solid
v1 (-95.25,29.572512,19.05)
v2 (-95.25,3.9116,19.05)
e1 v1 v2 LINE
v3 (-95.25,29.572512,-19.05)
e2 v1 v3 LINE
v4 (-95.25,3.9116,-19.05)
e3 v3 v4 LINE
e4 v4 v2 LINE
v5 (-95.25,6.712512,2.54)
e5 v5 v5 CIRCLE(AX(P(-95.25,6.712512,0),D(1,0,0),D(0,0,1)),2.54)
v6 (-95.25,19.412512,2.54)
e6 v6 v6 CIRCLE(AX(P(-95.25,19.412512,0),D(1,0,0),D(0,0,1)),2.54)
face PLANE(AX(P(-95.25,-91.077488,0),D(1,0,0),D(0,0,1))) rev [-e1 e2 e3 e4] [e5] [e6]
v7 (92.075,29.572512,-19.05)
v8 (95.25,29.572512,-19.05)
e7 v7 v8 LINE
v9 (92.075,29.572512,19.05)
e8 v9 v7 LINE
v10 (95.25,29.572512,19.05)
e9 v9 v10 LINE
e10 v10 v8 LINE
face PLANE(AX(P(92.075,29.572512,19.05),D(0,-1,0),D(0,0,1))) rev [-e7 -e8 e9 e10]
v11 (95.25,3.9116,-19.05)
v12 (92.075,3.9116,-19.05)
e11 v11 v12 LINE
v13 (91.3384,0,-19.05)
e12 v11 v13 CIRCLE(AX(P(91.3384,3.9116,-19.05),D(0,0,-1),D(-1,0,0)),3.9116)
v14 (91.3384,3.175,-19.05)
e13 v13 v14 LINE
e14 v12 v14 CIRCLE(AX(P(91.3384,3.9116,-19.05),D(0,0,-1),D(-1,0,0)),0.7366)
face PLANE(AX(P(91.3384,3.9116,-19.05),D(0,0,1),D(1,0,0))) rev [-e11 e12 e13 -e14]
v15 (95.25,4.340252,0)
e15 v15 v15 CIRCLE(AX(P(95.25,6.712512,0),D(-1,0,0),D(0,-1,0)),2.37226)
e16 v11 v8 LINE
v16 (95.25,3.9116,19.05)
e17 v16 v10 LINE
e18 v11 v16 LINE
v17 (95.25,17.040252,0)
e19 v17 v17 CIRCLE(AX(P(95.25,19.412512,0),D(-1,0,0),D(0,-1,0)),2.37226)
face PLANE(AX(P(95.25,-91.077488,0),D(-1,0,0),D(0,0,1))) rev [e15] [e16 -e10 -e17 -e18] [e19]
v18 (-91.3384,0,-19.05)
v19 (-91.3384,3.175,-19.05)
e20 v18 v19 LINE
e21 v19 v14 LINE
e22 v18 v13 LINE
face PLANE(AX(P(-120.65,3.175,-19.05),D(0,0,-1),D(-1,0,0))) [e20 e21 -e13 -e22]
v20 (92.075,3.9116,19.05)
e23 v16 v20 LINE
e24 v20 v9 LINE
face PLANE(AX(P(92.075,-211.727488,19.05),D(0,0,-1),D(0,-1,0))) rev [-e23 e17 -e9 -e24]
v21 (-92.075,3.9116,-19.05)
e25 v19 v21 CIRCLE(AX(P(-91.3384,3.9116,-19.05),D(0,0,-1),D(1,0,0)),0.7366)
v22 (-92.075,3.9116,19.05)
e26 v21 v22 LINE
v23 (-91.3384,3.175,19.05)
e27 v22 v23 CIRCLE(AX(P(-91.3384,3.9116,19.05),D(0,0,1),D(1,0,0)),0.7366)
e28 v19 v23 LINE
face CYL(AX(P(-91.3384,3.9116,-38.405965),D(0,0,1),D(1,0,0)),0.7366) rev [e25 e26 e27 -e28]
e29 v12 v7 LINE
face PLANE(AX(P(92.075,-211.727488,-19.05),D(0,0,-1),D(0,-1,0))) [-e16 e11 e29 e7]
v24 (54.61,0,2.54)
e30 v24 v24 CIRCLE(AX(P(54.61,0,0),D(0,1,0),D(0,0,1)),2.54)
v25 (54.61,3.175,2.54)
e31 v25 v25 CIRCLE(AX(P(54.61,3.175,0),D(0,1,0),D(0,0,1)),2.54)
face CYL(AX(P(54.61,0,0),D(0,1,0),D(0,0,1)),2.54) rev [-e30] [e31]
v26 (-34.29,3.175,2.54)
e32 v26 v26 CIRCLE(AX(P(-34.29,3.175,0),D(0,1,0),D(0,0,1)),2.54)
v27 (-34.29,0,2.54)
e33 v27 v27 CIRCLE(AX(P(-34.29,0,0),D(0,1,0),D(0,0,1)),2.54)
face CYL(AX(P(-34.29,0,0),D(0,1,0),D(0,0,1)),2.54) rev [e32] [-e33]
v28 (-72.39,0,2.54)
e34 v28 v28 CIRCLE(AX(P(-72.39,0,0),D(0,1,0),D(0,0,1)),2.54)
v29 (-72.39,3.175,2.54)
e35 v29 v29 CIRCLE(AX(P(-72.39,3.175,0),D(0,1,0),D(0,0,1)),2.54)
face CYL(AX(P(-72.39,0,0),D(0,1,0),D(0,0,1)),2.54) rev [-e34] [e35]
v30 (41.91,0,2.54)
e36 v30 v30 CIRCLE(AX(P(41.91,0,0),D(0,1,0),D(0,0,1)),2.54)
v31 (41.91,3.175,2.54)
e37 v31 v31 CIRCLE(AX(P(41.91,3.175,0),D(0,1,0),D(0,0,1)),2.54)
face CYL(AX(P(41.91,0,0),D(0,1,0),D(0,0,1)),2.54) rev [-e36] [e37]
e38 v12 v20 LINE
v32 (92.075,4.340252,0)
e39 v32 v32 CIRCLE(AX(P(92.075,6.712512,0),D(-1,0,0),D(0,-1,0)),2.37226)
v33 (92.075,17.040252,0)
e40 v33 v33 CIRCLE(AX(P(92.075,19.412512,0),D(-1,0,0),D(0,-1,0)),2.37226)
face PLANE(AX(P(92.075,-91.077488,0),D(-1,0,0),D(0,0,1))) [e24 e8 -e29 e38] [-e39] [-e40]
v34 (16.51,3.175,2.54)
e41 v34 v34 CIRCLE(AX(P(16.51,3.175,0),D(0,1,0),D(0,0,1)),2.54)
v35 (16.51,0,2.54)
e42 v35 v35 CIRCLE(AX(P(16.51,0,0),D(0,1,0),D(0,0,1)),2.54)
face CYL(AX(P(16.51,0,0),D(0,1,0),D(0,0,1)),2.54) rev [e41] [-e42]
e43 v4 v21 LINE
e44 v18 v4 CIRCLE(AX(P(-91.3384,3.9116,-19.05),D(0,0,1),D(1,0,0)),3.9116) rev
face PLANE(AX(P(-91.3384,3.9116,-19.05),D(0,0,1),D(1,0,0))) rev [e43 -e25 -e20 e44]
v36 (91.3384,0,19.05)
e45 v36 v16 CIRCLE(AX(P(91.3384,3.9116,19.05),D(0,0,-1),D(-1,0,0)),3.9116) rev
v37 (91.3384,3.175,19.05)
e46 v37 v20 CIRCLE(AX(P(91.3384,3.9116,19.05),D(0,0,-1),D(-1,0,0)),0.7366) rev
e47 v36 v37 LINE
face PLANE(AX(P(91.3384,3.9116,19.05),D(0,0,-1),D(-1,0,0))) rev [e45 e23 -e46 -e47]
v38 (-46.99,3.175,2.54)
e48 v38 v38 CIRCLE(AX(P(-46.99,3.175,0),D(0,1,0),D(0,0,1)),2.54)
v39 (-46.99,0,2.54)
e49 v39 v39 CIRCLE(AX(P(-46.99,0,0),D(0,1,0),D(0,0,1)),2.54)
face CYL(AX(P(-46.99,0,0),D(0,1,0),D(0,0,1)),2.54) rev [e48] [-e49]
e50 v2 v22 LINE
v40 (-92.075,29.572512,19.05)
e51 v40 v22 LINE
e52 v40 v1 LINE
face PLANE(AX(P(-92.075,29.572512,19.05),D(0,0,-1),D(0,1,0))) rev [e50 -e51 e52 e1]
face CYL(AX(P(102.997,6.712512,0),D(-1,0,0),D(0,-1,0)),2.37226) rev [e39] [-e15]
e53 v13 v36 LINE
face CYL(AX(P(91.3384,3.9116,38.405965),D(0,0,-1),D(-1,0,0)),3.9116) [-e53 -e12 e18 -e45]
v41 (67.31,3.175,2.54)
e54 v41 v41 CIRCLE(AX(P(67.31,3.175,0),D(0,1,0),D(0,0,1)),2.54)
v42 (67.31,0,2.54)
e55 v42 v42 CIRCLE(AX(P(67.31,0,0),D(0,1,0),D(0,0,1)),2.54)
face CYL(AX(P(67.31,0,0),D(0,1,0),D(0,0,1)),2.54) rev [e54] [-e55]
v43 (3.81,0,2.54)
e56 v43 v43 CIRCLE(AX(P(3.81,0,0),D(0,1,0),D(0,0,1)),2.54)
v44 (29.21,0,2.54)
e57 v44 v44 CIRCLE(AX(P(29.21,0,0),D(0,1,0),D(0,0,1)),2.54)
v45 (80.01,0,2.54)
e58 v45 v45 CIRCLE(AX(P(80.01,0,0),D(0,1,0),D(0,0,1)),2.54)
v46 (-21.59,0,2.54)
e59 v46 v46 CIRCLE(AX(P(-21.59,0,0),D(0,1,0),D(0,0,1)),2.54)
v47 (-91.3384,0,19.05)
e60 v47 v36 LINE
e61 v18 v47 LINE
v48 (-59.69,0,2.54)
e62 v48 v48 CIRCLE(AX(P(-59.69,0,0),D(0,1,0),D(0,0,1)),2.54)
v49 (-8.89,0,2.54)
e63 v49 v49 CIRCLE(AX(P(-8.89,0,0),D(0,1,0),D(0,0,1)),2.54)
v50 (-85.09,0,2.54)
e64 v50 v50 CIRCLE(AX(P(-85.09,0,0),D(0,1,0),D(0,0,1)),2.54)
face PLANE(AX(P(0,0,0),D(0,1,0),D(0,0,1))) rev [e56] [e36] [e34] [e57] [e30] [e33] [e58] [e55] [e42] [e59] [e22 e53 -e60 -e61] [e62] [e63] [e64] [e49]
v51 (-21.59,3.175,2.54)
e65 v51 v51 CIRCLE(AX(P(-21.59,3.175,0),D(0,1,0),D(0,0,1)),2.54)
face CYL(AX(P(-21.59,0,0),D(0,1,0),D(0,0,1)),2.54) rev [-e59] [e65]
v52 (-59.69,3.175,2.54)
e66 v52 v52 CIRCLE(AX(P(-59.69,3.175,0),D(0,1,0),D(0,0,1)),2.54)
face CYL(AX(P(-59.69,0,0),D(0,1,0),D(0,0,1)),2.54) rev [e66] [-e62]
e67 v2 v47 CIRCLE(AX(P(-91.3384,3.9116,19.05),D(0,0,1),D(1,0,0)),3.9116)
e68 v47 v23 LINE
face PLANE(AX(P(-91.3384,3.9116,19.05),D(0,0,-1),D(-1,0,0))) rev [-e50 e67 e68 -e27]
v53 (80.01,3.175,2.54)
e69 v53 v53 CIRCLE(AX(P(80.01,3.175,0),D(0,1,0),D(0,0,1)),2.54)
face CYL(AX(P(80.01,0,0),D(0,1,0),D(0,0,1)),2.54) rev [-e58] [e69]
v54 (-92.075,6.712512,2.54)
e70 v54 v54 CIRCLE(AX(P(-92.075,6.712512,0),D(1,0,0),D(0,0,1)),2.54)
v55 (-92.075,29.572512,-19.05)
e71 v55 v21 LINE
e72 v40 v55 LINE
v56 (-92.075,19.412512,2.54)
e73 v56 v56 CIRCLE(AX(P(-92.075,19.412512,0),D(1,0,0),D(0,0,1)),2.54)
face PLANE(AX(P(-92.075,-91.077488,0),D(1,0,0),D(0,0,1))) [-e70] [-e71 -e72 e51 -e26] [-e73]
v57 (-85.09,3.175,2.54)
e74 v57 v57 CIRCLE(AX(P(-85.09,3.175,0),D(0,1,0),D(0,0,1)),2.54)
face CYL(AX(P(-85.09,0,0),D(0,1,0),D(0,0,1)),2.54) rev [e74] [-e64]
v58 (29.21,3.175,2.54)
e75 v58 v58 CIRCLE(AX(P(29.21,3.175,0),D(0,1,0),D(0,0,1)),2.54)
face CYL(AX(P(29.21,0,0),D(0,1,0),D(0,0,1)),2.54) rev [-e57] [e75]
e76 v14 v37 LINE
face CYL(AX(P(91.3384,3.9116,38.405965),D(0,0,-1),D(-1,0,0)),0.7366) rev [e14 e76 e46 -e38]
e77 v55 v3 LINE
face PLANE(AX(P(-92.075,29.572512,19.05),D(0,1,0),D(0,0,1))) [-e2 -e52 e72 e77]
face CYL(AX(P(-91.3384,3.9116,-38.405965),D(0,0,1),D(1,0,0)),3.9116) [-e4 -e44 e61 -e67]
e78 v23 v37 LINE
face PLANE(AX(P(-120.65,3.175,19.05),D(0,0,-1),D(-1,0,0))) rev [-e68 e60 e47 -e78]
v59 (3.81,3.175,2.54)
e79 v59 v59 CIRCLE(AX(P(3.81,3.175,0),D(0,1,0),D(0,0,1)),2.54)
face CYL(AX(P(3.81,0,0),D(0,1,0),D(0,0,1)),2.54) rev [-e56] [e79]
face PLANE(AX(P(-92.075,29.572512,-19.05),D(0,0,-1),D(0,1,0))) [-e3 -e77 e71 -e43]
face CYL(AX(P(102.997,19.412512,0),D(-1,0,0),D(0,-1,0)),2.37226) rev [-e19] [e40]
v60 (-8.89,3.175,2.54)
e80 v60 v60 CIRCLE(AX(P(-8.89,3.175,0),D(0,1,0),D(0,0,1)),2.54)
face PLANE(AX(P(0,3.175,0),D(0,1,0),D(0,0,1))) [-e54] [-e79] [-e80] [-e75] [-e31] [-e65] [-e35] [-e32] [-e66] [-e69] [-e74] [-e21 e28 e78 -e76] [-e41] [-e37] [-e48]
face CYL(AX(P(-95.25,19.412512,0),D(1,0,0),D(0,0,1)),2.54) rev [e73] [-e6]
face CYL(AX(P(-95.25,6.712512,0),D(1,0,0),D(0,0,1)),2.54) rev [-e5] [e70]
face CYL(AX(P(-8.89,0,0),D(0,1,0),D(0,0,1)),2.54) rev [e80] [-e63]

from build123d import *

# Parameters (mm, degrees)
SKETCH1_W                  = 241.3
SKETCH1_H                  = 38.1
BOSS_EXTRUDE1_DEPTH        = 3.175
SKETCH2_R                  = 2.54
CUT_EXTRUDE1_DEPTH         = 3.175
LPATTERN1_COUNT            = 16
LPATTERN1_PITCH            = 12.7
SKETCHED_START             = -120.65
SKETCHED_BEND2_OUTLINE_W   = 3.175
SKETCHED_BEND2_OUTLINE_H   = 38.1
SKETCHED_BEND2_DEPTH       = 25.4
SKETCHED_START_2           = -94.869557784
SKETCHED_BEND2_2_OUTLINE_W = 26.397512257
SKETCHED_BEND2_2_OUTLINE_H = 38.1
SKETCHED_BEND2_2_OUTLINE_R = 2.54
SKETCHED_BEND2_2_DEPTH     = 2.794557784
SKETCHED_START_3           = -95.25
SKETCHED_BEND2_3_OUTLINE_W = 26.397512257
SKETCHED_BEND2_3_OUTLINE_H = 38.1
SKETCHED_BEND2_3_OUTLINE_R = 2.54
SKETCHED_BEND2_3_DEPTH     = 3.9116
SKETCHED_START_4           = -20
SKETCHED_BEND2_4_DEPTH     = 40
SKETCHED_START_5           = -19.05
SKETCHED_BEND3_DEPTH       = 38.1
SKETCHED_BEND3_2_DEPTH     = 38.1
SKETCH28_R                 = 2.372260046
CUT_EXTRUDE2_DEPTH         = 10.922
LPATTERN2_COUNT            = 2
LPATTERN2_PITCH            = 12.7


with BuildPart() as part:
    # Sketch1 → Boss-Extrude1 (new body)
    with BuildSketch(Plane(origin=(0, 0, 0), x_dir=(1, 0, 0), z_dir=(0, 1, 0))):
        Rectangle(SKETCH1_W, SKETCH1_H)
    extrude(amount=BOSS_EXTRUDE1_DEPTH)

    # Sketch2 → Cut-Extrude1 (cut)
    with BuildSketch(Plane(origin=(0, 3.175, 0), x_dir=(1, 0, 0), z_dir=(0, 1, 0))):
        with Locations(Location((-110.49, 0, 0), (0, 0, 270))):
            Circle(SKETCH2_R)
    cut_extrude1 = extrude(amount=-CUT_EXTRUDE1_DEPTH, mode=Mode.SUBTRACT)

    # LPattern1: Cut-Extrude1 ×16
    with Locations(*[(i * LPATTERN1_PITCH, 0, 0) for i in range(1, LPATTERN1_COUNT)]):
        add(cut_extrude1, mode=Mode.SUBTRACT)

    # Sketched Bend2: read off the stored shape, not the designer's step
    # Sketched Bend2 outline → Sketched Bend2 (cut)
    with BuildSketch(Plane.YZ.offset(SKETCHED_START)):
        with Locations((1.5875, 0)):
            Rectangle(SKETCHED_BEND2_OUTLINE_W, SKETCHED_BEND2_OUTLINE_H)
    extrude(amount=SKETCHED_BEND2_DEPTH, mode=Mode.SUBTRACT)

    # Sketched Bend2 2 outline → Sketched Bend2 2 (add)
    with BuildSketch(Plane.YZ.offset(SKETCHED_START_2)):
        with Locations((16.373756129, 0)):
            Rectangle(SKETCHED_BEND2_2_OUTLINE_W, SKETCHED_BEND2_2_OUTLINE_H)
        with Locations((6.712512257, 0)):
            Circle(SKETCHED_BEND2_2_OUTLINE_R, mode=Mode.SUBTRACT)
        with Locations((19.412512257, 0)):
            Circle(SKETCHED_BEND2_2_OUTLINE_R, mode=Mode.SUBTRACT)
    extrude(amount=SKETCHED_BEND2_2_DEPTH)

    # Sketched Bend2 3 outline → Sketched Bend2 3 (add)
    with BuildSketch(Plane.YZ.offset(SKETCHED_START_3)):
        with Locations((16.373756129, 0)):
            Rectangle(SKETCHED_BEND2_3_OUTLINE_W, SKETCHED_BEND2_3_OUTLINE_H)
        with Locations((6.712512257, 0)):
            Circle(SKETCHED_BEND2_3_OUTLINE_R, mode=Mode.SUBTRACT)
        with Locations((19.412512257, 0)):
            Circle(SKETCHED_BEND2_3_OUTLINE_R, mode=Mode.SUBTRACT)
    extrude(amount=SKETCHED_BEND2_3_DEPTH)

    # Sketched Bend2 4 outline → Sketched Bend2 4 (cut)
    with BuildSketch(Plane.XY.offset(SKETCHED_START_4)):
        with BuildLine():
            ThreePointArc((-91.3384, 0), (-94.104318885, 1.145681115), (-95.25, 3.9116))
            Line((-95.25, 3.9116), (-95.25, 0))
            Line((-95.25, 0), (-91.3384, 0))
        make_face()
        with BuildLine():
            Line((-92.075, 29.572512257), (-92.075, 3.9116))
            ThreePointArc((-92.075, 3.9116), (-91.859254855, 3.390745145), (-91.3384, 3.175))
            Line((-91.3384, 3.175), (-91.3384, 29.572512257))
            Line((-91.3384, 29.572512257), (-92.075, 29.572512257))
        make_face()
    extrude(amount=SKETCHED_BEND2_4_DEPTH, mode=Mode.SUBTRACT)

    # Sketched Bend3: read off the stored shape, not the designer's step
    # Sketched Bend3 outline → Sketched Bend3 (cut)
    with BuildSketch(Plane.XY.offset(SKETCHED_START_5)):
        with BuildLine():
            Line((120.65, 3.175), (95.180018799, 3.175))
            ThreePointArc((95.180018799, 3.175), (93.830319942, 0.896479843), (91.3384, 0))
            Line((91.3384, 0), (120.65, 0))
            Line((120.65, 0), (120.65, 3.175))
        make_face()
    extrude(amount=SKETCHED_BEND3_DEPTH, mode=Mode.SUBTRACT)

    # Sketched Bend3 2 outline → Sketched Bend3 2 (add)
    with BuildSketch(Plane.XY.offset(SKETCHED_START_5)):
        with BuildLine():
            Line((95.25, 29.572512257), (92.075, 29.572512257))
            Line((92.075, 29.572512257), (92.075, 3.9116))
            ThreePointArc((92.075, 3.9116), (91.859254855, 3.390745145), (91.3384, 3.175))
            Line((91.3384, 3.175), (95.180018799, 3.175))
            ThreePointArc((95.180018799, 3.175), (95.232465398, 3.541641581), (95.25, 3.9116))
            Line((95.25, 3.9116), (95.25, 29.572512257))
        make_face()
    extrude(amount=SKETCHED_BEND3_2_DEPTH)

    # Sketch28 → Cut-Extrude2 (cut)
    with BuildSketch(Plane.ZY.offset(-92.075)):
        with Locations(Location((0, 19.412512257, 0), (0, 0, 270))):
            Circle(SKETCH28_R)
    cut_extrude2 = extrude(amount=-CUT_EXTRUDE2_DEPTH, mode=Mode.SUBTRACT)

    # LPattern2: Cut-Extrude2 ×2
    with Locations(*[(0, -i * LPATTERN2_PITCH, 0) for i in range(1, LPATTERN2_COUNT)]):
        add(cut_extrude2, mode=Mode.SUBTRACT)


solid = part.part
